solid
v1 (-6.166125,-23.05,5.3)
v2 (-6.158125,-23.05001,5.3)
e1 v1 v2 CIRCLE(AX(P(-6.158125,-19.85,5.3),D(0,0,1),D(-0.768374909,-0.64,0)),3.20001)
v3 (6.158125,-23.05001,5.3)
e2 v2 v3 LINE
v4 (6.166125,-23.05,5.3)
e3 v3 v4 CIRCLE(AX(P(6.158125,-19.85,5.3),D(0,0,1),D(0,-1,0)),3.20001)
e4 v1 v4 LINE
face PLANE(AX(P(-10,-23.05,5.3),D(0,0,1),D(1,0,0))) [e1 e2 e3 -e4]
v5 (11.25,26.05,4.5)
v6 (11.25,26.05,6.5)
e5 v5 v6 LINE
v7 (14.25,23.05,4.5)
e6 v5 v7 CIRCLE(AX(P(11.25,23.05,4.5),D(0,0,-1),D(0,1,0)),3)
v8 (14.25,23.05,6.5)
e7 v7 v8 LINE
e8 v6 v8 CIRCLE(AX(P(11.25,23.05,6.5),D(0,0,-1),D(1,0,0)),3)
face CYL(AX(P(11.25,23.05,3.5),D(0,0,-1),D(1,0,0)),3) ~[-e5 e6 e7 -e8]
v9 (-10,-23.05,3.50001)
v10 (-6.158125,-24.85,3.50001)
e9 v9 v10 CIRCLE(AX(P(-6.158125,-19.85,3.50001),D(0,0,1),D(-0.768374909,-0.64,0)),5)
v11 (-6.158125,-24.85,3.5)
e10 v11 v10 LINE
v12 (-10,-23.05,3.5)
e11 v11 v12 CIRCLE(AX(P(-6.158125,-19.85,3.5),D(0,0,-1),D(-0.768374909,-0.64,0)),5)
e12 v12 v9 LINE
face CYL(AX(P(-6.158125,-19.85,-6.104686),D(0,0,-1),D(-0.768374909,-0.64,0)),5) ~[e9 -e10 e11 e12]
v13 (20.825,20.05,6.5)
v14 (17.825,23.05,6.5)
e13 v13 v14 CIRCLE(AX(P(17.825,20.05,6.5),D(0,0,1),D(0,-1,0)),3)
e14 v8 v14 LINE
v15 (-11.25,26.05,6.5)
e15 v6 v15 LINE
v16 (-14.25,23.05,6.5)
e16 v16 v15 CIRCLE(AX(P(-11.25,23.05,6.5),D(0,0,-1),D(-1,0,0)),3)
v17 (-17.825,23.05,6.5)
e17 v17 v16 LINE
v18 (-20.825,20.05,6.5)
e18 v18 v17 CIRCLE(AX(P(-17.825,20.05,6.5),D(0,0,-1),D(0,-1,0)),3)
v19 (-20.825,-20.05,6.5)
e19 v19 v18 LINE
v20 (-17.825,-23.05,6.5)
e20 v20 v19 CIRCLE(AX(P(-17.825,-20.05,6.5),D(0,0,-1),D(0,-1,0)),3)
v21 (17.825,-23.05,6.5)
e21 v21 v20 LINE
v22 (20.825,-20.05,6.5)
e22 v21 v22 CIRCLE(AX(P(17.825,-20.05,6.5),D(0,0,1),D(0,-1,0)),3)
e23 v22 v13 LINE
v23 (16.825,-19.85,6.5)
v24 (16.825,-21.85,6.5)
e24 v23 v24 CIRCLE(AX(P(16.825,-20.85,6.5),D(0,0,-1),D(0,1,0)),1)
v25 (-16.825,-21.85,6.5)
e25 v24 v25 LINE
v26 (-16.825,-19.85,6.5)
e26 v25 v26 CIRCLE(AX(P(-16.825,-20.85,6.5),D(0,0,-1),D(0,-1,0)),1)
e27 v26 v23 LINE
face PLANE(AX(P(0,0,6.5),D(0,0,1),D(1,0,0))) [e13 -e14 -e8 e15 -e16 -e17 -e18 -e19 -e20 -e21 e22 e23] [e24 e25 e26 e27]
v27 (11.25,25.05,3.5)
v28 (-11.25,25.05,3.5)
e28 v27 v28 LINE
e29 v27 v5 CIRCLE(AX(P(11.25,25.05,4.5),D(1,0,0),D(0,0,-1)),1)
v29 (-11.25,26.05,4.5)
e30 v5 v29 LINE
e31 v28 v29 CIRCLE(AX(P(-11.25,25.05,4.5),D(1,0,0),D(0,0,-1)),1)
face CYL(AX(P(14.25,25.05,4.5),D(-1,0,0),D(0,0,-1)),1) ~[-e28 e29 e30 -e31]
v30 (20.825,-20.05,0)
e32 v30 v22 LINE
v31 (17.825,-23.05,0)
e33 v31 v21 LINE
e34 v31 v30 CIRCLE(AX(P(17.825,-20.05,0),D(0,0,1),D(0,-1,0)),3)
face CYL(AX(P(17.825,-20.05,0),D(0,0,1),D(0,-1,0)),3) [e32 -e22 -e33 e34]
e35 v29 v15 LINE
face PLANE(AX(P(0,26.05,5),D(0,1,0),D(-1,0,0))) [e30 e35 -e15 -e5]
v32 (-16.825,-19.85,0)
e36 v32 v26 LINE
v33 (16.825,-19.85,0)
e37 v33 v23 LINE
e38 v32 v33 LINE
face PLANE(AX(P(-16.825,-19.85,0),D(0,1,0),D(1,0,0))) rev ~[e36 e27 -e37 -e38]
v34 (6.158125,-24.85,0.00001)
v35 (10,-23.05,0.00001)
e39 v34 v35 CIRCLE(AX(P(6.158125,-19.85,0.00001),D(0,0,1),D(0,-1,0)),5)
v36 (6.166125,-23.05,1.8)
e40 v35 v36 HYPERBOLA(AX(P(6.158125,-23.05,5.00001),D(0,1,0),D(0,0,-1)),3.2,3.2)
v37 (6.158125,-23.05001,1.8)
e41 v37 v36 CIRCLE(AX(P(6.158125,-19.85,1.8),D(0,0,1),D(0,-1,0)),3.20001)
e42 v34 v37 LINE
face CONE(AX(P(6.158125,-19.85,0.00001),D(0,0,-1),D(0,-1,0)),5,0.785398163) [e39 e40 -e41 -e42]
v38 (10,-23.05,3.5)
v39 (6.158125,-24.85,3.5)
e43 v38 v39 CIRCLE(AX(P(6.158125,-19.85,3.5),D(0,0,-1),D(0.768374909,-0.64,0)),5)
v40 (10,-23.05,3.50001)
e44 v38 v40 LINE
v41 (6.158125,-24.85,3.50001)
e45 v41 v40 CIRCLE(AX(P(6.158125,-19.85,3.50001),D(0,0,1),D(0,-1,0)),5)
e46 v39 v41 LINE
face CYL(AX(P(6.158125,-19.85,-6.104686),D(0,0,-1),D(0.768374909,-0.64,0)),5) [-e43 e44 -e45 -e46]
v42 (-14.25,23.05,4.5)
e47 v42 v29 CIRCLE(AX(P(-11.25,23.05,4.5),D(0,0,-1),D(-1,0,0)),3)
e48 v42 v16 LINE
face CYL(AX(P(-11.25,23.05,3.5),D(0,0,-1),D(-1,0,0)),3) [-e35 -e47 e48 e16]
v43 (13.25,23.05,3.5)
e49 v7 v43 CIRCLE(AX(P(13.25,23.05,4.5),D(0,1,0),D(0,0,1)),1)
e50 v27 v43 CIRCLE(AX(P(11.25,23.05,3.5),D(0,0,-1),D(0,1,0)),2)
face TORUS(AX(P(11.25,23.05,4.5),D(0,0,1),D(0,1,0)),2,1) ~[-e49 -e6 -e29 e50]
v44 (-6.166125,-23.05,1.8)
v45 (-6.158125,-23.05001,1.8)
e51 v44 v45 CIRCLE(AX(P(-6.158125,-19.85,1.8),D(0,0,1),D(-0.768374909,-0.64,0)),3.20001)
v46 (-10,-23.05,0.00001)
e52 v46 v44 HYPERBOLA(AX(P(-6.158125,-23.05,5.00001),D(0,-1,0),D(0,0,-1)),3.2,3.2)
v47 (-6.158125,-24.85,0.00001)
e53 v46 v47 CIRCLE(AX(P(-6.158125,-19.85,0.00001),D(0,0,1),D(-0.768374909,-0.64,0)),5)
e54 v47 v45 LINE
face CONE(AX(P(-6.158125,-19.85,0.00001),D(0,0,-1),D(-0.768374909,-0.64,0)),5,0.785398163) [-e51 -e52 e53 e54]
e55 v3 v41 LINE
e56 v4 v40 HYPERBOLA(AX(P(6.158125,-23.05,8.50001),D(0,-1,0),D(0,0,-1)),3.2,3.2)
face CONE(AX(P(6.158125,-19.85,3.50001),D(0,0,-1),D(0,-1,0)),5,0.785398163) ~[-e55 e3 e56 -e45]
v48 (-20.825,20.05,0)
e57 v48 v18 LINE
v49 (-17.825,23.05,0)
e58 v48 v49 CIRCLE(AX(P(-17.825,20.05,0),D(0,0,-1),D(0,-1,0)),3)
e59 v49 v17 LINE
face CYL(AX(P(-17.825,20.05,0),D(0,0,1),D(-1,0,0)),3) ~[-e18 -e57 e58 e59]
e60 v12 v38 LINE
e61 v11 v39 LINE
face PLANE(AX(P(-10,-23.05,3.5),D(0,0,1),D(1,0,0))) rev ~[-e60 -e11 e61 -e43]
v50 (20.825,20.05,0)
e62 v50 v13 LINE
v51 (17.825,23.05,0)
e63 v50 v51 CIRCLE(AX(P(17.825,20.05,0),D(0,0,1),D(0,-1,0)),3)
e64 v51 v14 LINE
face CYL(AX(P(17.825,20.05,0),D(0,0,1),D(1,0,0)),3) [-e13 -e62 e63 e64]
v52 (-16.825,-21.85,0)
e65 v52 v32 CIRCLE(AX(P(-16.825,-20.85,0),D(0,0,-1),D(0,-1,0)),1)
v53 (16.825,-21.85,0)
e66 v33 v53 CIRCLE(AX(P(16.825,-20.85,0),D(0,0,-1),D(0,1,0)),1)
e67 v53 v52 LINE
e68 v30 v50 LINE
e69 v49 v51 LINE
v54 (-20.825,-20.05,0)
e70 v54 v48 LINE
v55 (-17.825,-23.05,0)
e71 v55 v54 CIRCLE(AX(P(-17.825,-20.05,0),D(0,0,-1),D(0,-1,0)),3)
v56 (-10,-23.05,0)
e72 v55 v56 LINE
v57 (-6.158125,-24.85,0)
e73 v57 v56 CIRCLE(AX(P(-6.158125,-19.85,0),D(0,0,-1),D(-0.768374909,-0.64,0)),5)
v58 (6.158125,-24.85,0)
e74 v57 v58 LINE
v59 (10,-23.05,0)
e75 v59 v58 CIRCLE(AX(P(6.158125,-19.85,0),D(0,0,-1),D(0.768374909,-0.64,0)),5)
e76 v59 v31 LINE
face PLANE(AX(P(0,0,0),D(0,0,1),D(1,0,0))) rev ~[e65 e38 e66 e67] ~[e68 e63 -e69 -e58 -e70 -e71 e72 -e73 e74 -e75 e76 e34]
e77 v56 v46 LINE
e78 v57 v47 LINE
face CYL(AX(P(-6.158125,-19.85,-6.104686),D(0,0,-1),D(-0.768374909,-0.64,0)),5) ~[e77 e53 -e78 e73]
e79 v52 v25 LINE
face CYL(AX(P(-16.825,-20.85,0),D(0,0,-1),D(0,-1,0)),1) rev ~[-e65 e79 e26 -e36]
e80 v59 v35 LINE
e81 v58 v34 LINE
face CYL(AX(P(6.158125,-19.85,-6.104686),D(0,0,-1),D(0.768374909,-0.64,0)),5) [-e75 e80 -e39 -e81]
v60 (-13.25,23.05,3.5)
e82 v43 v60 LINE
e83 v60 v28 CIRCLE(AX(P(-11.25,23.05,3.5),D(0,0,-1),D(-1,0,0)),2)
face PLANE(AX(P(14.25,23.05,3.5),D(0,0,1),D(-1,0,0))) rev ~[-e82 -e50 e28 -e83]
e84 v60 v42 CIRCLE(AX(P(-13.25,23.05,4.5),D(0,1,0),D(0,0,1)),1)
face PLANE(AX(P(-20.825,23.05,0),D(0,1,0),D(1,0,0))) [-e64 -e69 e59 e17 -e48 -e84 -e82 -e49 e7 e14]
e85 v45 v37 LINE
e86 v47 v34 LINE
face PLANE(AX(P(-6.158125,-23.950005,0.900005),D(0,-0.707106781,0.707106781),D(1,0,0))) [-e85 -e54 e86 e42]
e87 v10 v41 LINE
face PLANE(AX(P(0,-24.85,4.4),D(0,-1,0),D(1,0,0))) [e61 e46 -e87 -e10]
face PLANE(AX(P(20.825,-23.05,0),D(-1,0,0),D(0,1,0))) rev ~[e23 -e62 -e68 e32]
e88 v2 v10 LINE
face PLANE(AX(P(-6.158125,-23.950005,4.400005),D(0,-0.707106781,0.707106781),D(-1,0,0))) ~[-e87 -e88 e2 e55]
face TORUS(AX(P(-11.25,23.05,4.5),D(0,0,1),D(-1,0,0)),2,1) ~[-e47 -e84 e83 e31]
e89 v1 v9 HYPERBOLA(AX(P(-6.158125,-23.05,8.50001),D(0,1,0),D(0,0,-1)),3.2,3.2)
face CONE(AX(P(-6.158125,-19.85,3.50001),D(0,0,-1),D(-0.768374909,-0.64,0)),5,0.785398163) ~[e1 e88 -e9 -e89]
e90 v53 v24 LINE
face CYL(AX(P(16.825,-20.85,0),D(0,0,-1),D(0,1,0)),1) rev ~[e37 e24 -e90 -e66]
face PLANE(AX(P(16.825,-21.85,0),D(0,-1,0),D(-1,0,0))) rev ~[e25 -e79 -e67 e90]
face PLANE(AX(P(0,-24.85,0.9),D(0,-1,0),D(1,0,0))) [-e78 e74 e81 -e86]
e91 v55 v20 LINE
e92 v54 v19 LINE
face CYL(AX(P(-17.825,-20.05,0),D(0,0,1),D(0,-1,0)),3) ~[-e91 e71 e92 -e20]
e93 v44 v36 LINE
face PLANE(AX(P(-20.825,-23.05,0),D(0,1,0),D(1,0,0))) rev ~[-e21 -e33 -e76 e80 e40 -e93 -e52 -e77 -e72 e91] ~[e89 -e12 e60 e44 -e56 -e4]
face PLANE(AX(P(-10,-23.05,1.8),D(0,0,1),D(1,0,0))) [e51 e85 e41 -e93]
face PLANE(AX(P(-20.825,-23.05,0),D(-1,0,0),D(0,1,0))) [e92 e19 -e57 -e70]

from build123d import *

# Parameters (mm, degrees)
F0_W        = 41.65
F0_H        = 46.1
F1_DEPTH    = 6.5
F2_W        = 28.5
F2_H        = 3
F3_DEPTH    = 3
F4_R        = 1
F5_T1_DEPTH = 10.5
F5_T4_ANGLE = 90
F5_T6_ANGLE = 90
F6_W        = 20
F6_H        = 1.8
F7_DEPTH    = 1.8
F8_T1_DEPTH = 21.0093727123
F8_T3_DEPTH = 21.0093727123
F9_SIZE2    = 1.79999
F9_SIZE     = 1.79999
F10_R       = 3


# Not quite as in the source:
# - a fillet or chamfer that OpenCascade refuses, or shapes differently, is made with other operations: its cross-section is extruded or revolved along the edge and cut away or added
# - a fillet or chamfer is up to 0.001 mm smaller than in the source, because OpenCascade refuses the exact size


with BuildPart() as f1:
    # F0 (on Top) → F1 (new body)
    with BuildSketch(Plane.XY):
        Rectangle(F0_W, F0_H)
        with BuildLine():
            ThreePointArc((16.825, -19.85), (17.825, -20.85), (16.825, -21.85))
            Line((16.825, -21.85), (-16.825, -21.85))
            ThreePointArc((-16.825, -21.85), (-17.825, -20.85), (-16.825, -19.85))
            Line((-16.825, -19.85), (16.825, -19.85))
        make_face(mode=Mode.SUBTRACT)
    extrude(amount=F1_DEPTH)

    # F2 (on face) → F3 (join)
    with BuildSketch(Plane(origin=(0, 23.05, 0), x_dir=(-1, 0, 0), z_dir=(0, 1, 0))):
        with Locations((0, 5)):
            Rectangle(F2_W, F2_H)
    extrude(amount=F3_DEPTH)

    # F4
    f4_edges = [f1.edges().sort_by_distance(p)[0] for p in [
        (-14.25, 24.55, 3.5),
        (14.25, 24.55, 3.5),
        (0, 26.05, 3.5),
    ]]
    fillet(f4_edges, radius=F4_R)

    # F5: fillet of radius 3 on 3 edges, made by hand

    # F5_s2 → F5_t1 (cut)
    with BuildSketch(Plane.XY.offset(3.5)):
        with BuildLine():
            ThreePointArc((14.25, 23.05), (13.3713203436, 25.1713203436), (11.25, 26.05))
            Line((11.25, 26.05), (14.25, 26.05))
            Line((14.25, 26.05), (14.25, 23.05))
        make_face()
        with BuildLine():
            ThreePointArc((-14.25, 23.05), (-13.3713203436, 25.1713203436), (-11.25, 26.05))
            Line((-11.25, 26.05), (-14.25, 26.05))
            Line((-14.25, 26.05), (-14.25, 23.05))
        make_face()
    extrude(amount=F5_T1_DEPTH, mode=Mode.SUBTRACT)

    # F5_s3 → F5_t4 (revolve, cut)
    with BuildSketch(Plane.XZ.offset(-23.05)):
        with BuildLine():
            ThreePointArc((-13.25, 3.5), (-13.9571067812, 3.7928932188), (-14.25, 4.5))
            Line((-14.25, 4.5), (-14.25, 3.5))
            Line((-14.25, 3.5), (-13.25, 3.5))
        make_face()
    revolve(axis=Axis((-11.25, 23.05, 3.5), (0, 0, -1)), revolution_arc=F5_T4_ANGLE, mode=Mode.SUBTRACT)

    # F5_s5 → F5_t6 (revolve, cut)
    with BuildSketch(Plane.YZ.offset(11.25)):
        with BuildLine():
            ThreePointArc((25.05, 3.5), (25.7571067812, 3.7928932188), (26.05, 4.5))
            Line((26.05, 4.5), (26.05, 3.5))
            Line((26.05, 3.5), (25.05, 3.5))
        make_face()
    revolve(axis=Axis((11.25, 23.05, 3.5), (0, 0, -1)), revolution_arc=F5_T6_ANGLE, mode=Mode.SUBTRACT)

    # F6 (on face) → F7 (join)
    with BuildSketch(Plane.XZ.offset(23.05)):
        with Locations((0, 4.4)):
            Rectangle(F6_W, F6_H)
        with Locations((0, 0.9)):
            Rectangle(F6_W, F6_H)
    extrude(amount=F7_DEPTH)

    # F8: fillet of radius 5 on 4 edges, made by hand

    # F8_s2 → F8_t1 (cut)
    with BuildSketch(Plane.XY.offset(-6.1046863561)):
        with BuildLine():
            ThreePointArc((-10, -23.05), (-8.2794458011, -24.3776925691), (-6.1581254575, -24.85))
            Line((-6.1581254575, -24.85), (-6.1581254575, -24.95))
            Line((-6.1581254575, -24.95), (-10, -24.95))
            Line((-10, -24.95), (-10.1, -24.85))
            ThreePointArc((-10.1, -24.85), (-10.1, -23.95), (-10.0768374908, -23.114))
            Line((-10.0768374908, -23.114), (-10, -23.05))
        make_face()
        with BuildLine():
            ThreePointArc((10, -23.05), (8.2794458011, -24.3776925691), (6.1581254575, -24.85))
            Line((6.1581254575, -24.85), (6.1581254575, -24.95))
            Line((6.1581254575, -24.95), (10, -24.95))
            Line((10, -24.95), (10.1, -24.85))
            ThreePointArc((10.1, -24.85), (10.1, -23.95), (10.0768374908, -23.114))
            Line((10.0768374908, -23.114), (10, -23.05))
        make_face()
    extrude(amount=F8_T1_DEPTH, mode=Mode.SUBTRACT)

    # F8_s4 → F8_t3 (cut)
    with BuildSketch(Plane.XY.offset(-9.6046863561)):
        with BuildLine():
            ThreePointArc((-10, -23.05), (-8.2794458011, -24.3776925691), (-6.1581254575, -24.85))
            Line((-6.1581254575, -24.85), (-6.1581254575, -24.95))
            Line((-6.1581254575, -24.95), (-10, -24.95))
            Line((-10, -24.95), (-10.1, -24.85))
            ThreePointArc((-10.1, -24.85), (-10.1, -23.95), (-10.0768374908, -23.114))
            Line((-10.0768374908, -23.114), (-10, -23.05))
        make_face()
        with BuildLine():
            ThreePointArc((10, -23.05), (8.2794458011, -24.3776925691), (6.1581254575, -24.85))
            Line((6.1581254575, -24.85), (6.1581254575, -24.95))
            Line((6.1581254575, -24.95), (10, -24.95))
            Line((10, -24.95), (10.1, -24.85))
            ThreePointArc((10.1, -24.85), (10.1, -23.95), (10.0768374908, -23.114))
            Line((10.0768374908, -23.114), (10, -23.05))
        make_face()
    extrude(amount=F8_T3_DEPTH, mode=Mode.SUBTRACT)

    # F9 (size 1.8 and 1.8 in the source; OpenCascade refuses exactly that, so slightly less here)
    f9_edges = [f1.edges().sort_by_distance(p)[0] for p in [
        (0, -24.85, 5.3),
        (0, -24.85, 1.8),
    ]]
    chamfer(f9_edges, length=F9_SIZE, length2=F9_SIZE2)

    # F10
    f10_edges = [f1.edges().sort_by_distance(p)[0] for p in [
        (20.825, -23.05, 3.25),
        (20.825, 23.05, 3.25),
        (-20.825, 23.05, 3.25),
        (-20.825, -23.05, 3.25),
    ]]
    fillet(f10_edges, radius=F10_R)


solid = f1.part
